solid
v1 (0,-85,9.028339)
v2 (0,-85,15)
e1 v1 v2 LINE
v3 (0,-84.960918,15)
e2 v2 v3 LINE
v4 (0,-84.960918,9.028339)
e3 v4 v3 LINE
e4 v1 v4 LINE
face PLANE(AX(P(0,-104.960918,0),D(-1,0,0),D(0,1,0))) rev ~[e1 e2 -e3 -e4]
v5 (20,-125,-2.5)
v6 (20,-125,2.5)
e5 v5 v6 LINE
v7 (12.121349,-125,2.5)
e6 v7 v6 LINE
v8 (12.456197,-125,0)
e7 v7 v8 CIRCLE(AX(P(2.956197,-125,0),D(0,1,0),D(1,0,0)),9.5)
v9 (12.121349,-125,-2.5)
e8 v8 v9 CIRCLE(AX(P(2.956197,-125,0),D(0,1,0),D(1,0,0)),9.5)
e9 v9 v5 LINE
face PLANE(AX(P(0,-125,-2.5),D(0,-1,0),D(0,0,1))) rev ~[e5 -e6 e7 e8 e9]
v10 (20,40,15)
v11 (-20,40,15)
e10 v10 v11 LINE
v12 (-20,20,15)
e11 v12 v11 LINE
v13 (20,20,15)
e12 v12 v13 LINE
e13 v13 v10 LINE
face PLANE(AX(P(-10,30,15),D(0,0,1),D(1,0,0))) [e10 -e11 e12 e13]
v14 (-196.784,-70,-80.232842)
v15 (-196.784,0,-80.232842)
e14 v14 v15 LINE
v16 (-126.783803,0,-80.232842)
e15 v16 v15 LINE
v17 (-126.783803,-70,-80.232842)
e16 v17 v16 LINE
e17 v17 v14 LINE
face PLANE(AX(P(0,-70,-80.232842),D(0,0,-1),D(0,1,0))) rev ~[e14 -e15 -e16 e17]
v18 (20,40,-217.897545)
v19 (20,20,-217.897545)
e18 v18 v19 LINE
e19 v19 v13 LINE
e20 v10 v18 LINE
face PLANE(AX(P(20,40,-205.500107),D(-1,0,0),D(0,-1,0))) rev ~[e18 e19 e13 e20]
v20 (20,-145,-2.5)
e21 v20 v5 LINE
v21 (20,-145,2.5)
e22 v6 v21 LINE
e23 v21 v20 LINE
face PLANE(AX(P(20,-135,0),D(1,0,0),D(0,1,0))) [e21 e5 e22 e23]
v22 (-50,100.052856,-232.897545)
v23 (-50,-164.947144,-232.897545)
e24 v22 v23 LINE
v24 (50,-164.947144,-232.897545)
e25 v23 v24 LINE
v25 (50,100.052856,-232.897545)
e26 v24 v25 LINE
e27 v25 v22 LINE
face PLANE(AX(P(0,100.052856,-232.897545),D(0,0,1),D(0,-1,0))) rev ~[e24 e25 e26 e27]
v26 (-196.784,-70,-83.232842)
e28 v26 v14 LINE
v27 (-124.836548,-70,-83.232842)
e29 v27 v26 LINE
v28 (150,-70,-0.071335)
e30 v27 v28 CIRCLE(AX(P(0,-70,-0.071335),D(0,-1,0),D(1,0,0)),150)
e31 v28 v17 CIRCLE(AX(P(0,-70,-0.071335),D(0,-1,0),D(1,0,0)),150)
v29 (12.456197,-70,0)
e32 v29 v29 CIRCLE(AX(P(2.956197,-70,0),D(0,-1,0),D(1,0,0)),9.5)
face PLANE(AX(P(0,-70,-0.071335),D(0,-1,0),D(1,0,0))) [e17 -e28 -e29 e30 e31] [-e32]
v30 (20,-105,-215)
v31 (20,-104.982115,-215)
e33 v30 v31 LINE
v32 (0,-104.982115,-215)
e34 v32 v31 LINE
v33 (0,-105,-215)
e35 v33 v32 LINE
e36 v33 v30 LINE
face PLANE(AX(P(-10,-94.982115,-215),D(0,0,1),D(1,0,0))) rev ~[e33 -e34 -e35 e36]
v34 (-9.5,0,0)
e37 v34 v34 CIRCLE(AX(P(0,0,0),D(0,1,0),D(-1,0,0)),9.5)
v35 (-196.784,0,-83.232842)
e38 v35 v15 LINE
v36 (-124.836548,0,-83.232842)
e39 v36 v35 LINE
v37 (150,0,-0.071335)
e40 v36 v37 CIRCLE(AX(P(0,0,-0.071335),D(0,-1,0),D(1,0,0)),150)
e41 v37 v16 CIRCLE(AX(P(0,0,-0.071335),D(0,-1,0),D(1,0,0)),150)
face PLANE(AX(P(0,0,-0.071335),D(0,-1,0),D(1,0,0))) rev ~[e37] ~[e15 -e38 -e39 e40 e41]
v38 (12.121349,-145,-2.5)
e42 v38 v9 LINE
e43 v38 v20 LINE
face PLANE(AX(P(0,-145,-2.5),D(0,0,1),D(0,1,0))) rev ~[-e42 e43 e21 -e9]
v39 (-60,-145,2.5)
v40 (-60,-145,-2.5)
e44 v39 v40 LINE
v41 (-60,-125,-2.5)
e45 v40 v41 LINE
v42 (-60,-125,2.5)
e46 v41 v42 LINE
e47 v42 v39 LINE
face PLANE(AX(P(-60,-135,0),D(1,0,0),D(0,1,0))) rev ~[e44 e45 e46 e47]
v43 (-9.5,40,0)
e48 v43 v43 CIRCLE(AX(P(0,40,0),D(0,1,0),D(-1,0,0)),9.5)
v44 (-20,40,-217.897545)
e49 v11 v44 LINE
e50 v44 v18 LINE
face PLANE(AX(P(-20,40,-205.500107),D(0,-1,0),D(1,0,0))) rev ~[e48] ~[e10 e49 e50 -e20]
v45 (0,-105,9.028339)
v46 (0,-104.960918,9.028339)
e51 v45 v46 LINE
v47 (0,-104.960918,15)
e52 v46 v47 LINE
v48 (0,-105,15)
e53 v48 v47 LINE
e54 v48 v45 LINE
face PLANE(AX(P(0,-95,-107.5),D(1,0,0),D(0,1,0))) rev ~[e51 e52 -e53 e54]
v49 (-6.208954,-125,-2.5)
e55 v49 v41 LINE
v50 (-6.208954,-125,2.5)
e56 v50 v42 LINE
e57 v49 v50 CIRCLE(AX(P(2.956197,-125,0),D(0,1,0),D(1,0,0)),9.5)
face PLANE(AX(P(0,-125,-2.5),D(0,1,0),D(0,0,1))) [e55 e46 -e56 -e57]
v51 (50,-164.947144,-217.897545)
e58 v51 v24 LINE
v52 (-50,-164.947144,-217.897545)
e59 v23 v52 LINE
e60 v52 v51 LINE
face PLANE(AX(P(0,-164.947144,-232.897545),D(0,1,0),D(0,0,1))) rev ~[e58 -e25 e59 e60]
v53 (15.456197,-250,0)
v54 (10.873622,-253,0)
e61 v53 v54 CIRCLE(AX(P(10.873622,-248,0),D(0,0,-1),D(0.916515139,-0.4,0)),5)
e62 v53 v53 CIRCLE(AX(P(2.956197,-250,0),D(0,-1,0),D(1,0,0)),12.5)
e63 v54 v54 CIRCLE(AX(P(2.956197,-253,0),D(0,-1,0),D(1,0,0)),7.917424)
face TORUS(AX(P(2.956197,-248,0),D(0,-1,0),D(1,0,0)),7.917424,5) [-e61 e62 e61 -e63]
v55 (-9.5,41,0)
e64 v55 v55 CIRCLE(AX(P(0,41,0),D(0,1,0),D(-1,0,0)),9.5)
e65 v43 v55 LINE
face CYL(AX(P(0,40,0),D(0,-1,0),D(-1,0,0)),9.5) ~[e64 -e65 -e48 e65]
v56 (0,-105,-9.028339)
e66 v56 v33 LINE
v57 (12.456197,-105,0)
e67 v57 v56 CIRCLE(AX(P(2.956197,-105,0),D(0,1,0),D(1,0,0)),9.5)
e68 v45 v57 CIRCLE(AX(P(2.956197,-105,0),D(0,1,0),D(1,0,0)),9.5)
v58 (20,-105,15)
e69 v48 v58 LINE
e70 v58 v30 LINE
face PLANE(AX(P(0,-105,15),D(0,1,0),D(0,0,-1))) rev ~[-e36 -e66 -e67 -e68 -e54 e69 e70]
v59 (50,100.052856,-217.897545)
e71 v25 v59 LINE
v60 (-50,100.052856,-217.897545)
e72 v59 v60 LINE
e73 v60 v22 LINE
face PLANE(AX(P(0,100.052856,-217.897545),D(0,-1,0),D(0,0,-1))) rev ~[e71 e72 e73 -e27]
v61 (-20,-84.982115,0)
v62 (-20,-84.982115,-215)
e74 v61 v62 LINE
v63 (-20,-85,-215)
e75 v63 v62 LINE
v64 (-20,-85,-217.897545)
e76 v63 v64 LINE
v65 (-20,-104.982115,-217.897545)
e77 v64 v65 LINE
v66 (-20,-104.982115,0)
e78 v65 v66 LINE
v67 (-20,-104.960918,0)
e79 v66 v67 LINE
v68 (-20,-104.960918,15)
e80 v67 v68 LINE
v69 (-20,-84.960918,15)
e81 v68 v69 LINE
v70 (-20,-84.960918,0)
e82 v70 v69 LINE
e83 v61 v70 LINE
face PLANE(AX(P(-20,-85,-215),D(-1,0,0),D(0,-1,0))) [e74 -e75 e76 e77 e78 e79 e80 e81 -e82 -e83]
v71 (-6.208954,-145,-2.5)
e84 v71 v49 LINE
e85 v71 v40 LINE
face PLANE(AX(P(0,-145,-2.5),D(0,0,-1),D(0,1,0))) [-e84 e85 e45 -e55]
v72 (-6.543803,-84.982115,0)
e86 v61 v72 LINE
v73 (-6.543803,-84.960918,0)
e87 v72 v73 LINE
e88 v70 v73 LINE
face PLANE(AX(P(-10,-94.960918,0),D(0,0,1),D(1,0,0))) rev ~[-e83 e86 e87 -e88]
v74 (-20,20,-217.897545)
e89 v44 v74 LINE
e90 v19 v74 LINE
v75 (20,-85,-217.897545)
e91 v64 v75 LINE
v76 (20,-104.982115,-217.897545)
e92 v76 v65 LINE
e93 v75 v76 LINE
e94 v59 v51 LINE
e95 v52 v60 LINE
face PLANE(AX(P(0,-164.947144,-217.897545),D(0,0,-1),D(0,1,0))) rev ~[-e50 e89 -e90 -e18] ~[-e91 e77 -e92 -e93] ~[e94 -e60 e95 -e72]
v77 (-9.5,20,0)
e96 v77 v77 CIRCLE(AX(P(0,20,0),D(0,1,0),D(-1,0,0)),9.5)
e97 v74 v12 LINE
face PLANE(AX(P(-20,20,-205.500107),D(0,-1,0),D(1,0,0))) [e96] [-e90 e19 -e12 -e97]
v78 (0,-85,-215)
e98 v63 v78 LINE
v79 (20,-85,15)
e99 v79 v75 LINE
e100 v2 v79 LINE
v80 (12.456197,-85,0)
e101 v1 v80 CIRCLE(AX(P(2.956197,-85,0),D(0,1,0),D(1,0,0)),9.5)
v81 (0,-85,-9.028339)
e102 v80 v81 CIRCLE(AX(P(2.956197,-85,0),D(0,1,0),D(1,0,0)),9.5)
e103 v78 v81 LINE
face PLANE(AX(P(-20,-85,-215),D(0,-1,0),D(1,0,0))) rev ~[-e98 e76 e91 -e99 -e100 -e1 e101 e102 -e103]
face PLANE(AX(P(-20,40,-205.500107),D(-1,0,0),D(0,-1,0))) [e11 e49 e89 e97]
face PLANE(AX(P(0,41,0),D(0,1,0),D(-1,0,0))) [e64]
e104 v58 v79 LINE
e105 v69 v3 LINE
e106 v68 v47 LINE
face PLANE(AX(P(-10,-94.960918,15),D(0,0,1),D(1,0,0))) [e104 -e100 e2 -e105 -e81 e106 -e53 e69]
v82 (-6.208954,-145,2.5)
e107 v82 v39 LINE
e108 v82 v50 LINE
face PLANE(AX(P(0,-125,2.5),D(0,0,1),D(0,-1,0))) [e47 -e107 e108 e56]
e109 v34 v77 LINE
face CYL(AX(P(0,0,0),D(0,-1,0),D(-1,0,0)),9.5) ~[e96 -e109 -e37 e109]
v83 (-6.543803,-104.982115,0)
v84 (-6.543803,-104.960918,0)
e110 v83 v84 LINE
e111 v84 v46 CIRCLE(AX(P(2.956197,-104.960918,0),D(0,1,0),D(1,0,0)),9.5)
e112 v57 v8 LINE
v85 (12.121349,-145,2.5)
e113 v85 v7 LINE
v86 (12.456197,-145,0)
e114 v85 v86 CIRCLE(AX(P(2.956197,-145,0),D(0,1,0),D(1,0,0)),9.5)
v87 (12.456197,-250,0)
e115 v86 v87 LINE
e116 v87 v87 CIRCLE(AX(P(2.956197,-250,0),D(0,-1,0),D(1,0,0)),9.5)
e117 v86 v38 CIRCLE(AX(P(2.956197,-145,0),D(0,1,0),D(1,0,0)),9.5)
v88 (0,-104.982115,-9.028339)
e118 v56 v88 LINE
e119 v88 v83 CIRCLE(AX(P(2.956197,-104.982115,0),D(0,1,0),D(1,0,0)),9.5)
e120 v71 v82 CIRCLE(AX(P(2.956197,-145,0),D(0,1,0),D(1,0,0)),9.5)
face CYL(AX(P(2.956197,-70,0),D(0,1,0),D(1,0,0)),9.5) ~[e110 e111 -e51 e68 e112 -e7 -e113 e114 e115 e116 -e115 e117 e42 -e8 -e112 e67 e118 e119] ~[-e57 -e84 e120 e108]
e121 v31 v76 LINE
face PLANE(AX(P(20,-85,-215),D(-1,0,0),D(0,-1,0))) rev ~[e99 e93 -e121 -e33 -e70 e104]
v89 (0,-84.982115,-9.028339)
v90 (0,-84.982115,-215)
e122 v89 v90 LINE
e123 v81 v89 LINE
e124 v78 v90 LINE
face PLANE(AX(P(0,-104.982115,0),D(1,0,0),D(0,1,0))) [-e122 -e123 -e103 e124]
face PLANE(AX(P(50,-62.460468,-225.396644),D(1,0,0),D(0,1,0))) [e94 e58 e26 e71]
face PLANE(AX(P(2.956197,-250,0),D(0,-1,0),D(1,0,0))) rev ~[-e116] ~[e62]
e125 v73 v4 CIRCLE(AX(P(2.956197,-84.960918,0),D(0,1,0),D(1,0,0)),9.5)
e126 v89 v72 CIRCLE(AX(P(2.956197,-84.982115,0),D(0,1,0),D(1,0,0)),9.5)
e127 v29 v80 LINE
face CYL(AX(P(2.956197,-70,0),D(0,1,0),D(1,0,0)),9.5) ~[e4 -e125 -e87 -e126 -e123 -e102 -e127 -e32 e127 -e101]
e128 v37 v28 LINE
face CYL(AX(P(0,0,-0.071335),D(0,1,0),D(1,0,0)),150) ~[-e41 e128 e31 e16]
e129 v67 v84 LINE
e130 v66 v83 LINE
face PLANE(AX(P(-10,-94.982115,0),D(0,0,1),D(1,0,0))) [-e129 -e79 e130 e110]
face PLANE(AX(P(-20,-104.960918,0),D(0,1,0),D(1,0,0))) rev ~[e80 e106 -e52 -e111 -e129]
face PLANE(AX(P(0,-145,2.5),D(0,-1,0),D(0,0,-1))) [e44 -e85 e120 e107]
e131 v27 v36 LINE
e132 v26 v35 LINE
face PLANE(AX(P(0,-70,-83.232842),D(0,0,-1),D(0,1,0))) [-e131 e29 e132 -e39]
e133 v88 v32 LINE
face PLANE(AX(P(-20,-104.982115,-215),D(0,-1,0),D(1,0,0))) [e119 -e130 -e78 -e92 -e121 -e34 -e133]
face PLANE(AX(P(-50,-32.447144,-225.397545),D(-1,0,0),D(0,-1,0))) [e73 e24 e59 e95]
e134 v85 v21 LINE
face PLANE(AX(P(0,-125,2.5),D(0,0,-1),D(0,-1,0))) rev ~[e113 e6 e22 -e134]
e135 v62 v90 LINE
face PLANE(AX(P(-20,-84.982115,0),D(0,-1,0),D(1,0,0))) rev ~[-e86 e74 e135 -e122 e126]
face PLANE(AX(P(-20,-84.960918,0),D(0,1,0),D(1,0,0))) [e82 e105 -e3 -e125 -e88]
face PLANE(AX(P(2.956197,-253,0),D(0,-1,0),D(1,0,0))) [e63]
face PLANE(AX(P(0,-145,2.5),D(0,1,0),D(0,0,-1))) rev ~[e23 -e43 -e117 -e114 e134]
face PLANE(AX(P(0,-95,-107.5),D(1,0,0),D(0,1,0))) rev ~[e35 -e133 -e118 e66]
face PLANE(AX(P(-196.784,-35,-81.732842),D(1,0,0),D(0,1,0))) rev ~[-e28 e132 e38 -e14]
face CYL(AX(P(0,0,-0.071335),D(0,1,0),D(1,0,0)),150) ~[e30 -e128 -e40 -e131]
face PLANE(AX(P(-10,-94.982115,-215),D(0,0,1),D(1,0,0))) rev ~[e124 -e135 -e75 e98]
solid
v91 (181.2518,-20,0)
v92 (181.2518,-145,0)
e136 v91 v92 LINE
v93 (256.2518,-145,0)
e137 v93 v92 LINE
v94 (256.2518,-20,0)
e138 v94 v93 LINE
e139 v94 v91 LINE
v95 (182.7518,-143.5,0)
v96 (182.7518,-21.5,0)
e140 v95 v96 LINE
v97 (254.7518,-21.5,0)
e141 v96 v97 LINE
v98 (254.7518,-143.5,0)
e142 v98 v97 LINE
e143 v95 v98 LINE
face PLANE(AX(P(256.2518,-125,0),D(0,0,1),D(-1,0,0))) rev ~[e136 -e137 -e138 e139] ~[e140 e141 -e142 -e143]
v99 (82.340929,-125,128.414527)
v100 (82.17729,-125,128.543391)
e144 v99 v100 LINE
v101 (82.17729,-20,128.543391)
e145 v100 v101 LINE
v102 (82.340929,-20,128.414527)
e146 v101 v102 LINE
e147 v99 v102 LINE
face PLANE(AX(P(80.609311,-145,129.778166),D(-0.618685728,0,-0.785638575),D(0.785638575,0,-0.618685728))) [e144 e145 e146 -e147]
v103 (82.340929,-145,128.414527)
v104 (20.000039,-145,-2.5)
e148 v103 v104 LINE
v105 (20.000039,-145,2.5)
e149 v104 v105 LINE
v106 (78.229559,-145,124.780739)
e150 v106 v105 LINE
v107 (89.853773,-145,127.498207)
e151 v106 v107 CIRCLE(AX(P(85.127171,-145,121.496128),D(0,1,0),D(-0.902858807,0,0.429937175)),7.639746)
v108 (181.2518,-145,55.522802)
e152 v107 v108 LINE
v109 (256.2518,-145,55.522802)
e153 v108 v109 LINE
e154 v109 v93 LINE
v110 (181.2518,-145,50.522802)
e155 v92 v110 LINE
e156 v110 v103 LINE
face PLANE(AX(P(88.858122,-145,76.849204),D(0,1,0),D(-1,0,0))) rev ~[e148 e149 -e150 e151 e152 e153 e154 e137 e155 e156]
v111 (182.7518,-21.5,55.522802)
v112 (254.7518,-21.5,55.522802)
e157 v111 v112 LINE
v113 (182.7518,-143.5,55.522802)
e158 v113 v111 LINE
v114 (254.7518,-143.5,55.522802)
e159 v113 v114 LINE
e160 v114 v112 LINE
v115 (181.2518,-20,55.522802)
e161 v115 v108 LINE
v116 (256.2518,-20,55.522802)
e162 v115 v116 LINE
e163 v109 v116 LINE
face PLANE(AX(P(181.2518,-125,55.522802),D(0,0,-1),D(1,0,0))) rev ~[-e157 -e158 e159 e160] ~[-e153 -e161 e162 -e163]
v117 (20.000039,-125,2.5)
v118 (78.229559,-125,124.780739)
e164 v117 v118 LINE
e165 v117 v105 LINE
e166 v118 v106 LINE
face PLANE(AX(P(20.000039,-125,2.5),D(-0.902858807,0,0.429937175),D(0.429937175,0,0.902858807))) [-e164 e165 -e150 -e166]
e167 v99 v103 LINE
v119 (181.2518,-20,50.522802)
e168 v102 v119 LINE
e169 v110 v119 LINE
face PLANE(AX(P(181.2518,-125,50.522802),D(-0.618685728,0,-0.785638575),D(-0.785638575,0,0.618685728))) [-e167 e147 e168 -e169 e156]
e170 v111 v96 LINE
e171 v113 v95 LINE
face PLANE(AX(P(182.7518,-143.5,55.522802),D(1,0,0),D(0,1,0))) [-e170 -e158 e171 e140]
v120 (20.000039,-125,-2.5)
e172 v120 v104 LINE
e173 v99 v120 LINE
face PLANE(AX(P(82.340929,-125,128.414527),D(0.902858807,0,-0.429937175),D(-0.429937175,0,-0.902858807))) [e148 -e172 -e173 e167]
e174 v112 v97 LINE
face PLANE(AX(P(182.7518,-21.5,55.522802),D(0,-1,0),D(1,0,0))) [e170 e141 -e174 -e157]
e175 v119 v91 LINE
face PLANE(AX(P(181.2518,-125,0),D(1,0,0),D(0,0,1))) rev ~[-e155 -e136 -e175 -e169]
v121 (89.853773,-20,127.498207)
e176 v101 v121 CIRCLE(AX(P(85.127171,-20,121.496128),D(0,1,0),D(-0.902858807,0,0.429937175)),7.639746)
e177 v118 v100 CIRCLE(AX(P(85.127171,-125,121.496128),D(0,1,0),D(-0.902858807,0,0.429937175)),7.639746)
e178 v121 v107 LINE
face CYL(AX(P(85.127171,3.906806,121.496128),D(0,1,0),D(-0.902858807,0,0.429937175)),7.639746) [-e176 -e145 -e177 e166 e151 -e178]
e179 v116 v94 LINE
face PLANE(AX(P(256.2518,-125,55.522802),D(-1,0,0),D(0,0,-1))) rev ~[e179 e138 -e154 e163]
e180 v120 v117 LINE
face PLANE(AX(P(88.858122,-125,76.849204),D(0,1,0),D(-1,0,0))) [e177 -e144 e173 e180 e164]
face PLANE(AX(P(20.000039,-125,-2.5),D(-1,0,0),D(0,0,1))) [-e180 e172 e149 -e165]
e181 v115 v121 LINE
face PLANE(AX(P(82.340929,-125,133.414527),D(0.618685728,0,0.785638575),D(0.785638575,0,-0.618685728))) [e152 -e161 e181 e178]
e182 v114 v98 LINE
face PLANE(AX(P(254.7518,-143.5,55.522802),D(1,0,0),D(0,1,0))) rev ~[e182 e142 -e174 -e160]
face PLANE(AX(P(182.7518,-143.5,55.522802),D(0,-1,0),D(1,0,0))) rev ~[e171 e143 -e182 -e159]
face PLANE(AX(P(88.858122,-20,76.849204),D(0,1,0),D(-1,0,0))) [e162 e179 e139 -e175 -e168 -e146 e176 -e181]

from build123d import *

# Parameters (mm, degrees)
F0_R         = 150
F1_DEPTH     = 70
F2_W         = 70
F2_H         = 3
F3_DEPTH     = 196.784
F5_R         = 9.5
F6_DEPTH     = 180
F7_R         = 9.5
F8_DEPTH     = 40
F9_W         = 20
F9_H         = 215
F10_DEPTH    = 20
F11_W        = 20
F11_H        = 18.9998925924
F11_H_2      = 196.0001074076
F12_DEPTH    = 20
F13_W        = 20
F13_H        = 20
F14_DEPTH    = 15
F15_W        = 40
F15_H        = 20
F16_DEPTH    = 25
F17_W        = 20
F17_H        = 215
F17_H_2      = 15
F18_DEPTH    = 20
F19_W        = 20
F19_H        = 20
F20_DEPTH    = 15
F21_W        = 20
F21_H        = 20
F22_DEPTH    = 215
F23_W        = 40
F23_H        = 19.9821153283
F24_DEPTH    = 15.5
F26_DEPTH    = 50
F28_DEPTH    = 50
F30_DEPTH    = 60
F31_DEPTH    = 20
F34_DEPTH    = 20
F36_DEPTH    = 125
F37_DEPTH    = 105
F38_W        = 72
F38_H        = 122
F30_FACE_W   = 53.7910459743
F30_FACE_H   = 20
F39_DEPTH    = 161
F40_R        = 12.5
F41_DEPTH    = 3
F43_R        = 9.5
F44_DEPTH    = 1
F45_T1_DEPTH = 172.813612667


# Not quite as in the source:
# - a fillet or chamfer that OpenCascade refuses, or shapes differently, is made with other operations: its cross-section is extruded or revolved along the edge and cut away or added


with BuildPart() as f1:
    # F0 (on Front) → F1 (new body)
    with BuildSketch(Plane.XZ):
        with Locations((0, -0.0713349276)):
            Circle(F0_R)
    extrude(amount=F1_DEPTH)

    # F2 (on Right) → F3 (join)
    with BuildSketch(Plane.YZ):
        with Locations((-35, -81.7328423858)):
            Rectangle(F2_W, F2_H)
    extrude(amount=-F3_DEPTH)

    # F5 (on face) → F6 (join)
    with BuildSketch(Plane.XZ.offset(70)):
        with Locations((2.9561973643, 0)):
            Circle(F5_R)
    extrude(amount=F6_DEPTH)

    # F7 (on face) → F8 (join)
    with BuildSketch(Plane(origin=(0, 0, 0), x_dir=(-1, 0, 0), z_dir=(0, 1, 0))):
        Circle(F7_R)
    extrude(amount=F8_DEPTH)

    # F9 (on Right) → F10 (join)
    with BuildSketch(Plane.YZ):
        with Locations((30, -98.0001074076)):
            Rectangle(F9_W, F9_H)
    extrude(amount=-F10_DEPTH)

    # F11 (on face) → F12 (join)
    with BuildSketch(Plane.YZ):
        with Locations((30, -5.37038e-05)):
            Rectangle(F11_W, F11_H)
        with Locations((30, -107.5000537038)):
            Rectangle(F11_W, F11_H_2)
    extrude(amount=F12_DEPTH)

    # F13 (on Top) → F14 (join)
    with BuildSketch(Plane.XY):
        with Locations((-10, 30)):
            Rectangle(F13_W, F13_H)
        with Locations((10, 30)):
            Rectangle(F13_W, F13_H)
    extrude(amount=F14_DEPTH)

    # F15 (on face) → F16 (join)
    with BuildSketch(Plane(origin=(0, 0, -205.5001074076), x_dir=(1, 0, 0), z_dir=(0, 0, -1))):
        with Locations((0, -30)):
            Rectangle(F15_W, F15_H)
    extrude(amount=F16_DEPTH)

    # F17 (on Right) → F18 (join)
    with BuildSketch(Plane.YZ):
        with Locations((-95, -107.5)):
            Rectangle(F17_W, F17_H)
        with Locations((-95, 7.5)):
            Rectangle(F17_W, F17_H_2)
    extrude(amount=F18_DEPTH)

    # F19 (on Top) → F20 (join)
    with BuildSketch(Plane.XY):
        with Locations((-10, -94.9609184265)):
            Rectangle(F19_W, F19_H)
    extrude(amount=F20_DEPTH)

    # F21 (on Top) → F22 (join)
    with BuildSketch(Plane.XY):
        with Locations((-10, -94.9821153283)):
            Rectangle(F21_W, F21_H)
    extrude(amount=-F22_DEPTH)

    # F23 (on face) → F24 (join)
    with BuildSketch(Plane(origin=(0, 0, -215), x_dir=(1, 0, 0), z_dir=(0, 0, -1))):
        with Locations((0, 94.9910576642)):
            Rectangle(F23_W, F23_H)
    extrude(amount=F24_DEPTH)

    # F25 (on Right) → F26 (join)
    with BuildSketch(Plane.YZ):
        Polygon((40.000025183, -230.4975450993), (40.0528562069, -217.8975450993), (40.0000102818, -217.8975450993), (-141.9770932198, -217.8975450993), (-164.9471437931, -217.8975450993), (-164.9471437931, -232.8975450993), (-126.0763406754, -232.8975450993), (20.0036764145, -232.8975450993), (40.000025183, -232.8975450993), align=None)
        Polygon((100.0528562069, -217.8975450993), (40.0528562069, -217.8975450993), (40.000025183, -230.4975450993), (40.000025183, -232.8975450993), (100.0528562069, -232.8975450993), align=None)
    extrude(amount=F26_DEPTH)

    # F27 (on face) → F28 (join)
    with BuildSketch(Plane(origin=(0, 0, 0), x_dir=(0, -1, 0), z_dir=(-1, 0, 0))):
        Polygon((164.9471437931, -217.8975450993), (-100.0528562069, -217.8975450993), (-100.0528562069, -232.8975450993), (-40, -232.8975450993), (164.9471437931, -232.8975450993), align=None)
    extrude(amount=F28_DEPTH)

    # F29 (on Right) → F30 (join)
    with BuildSketch(Plane.YZ):
        Polygon((-145, 2.5), (-145, -2.5), (-125, -2.5), (-125, 0), (-125, 2.5), align=None)
    extrude(amount=-F30_DEPTH)

    # F29 (on Right) → F31 (join)
    with BuildSketch(Plane.YZ):
        Polygon((-145, 2.5), (-145, -2.5), (-125, -2.5), (-125, 0), (-125, 2.5), align=None)
    extrude(amount=F31_DEPTH)

    # F40 (on face) → F41 (join)
    with BuildSketch(Plane.XZ.offset(250)):
        with Locations((2.9561973643, 0)):
            Circle(F40_R)
    extrude(amount=F41_DEPTH)

    # F42: fillet of radius 5 on 1 edges, made by hand

    # F42_s1 → F42_t2 (revolve, cut)
    with BuildSketch(Plane.XY):
        with BuildLine():
            ThreePointArc((15.4561973643, -250), (13.6122344568, -252.1833001327), (10.8736216693, -253))
            Line((10.8736216693, -253), (15.4561973643, -253))
            Line((15.4561973643, -253), (15.4561973643, -250))
        make_face()
    revolve(axis=Axis((2.9561973643, -253, 0), (0, -1, 0)), mode=Mode.SUBTRACT)

    # F43 (on face) → F44 (join)
    with BuildSketch(Plane(origin=(0, 40, 0), x_dir=(-1, 0, 0), z_dir=(0, 1, 0))):
        Circle(F43_R)
    extrude(amount=F44_DEPTH)


with BuildPart() as f34:
    # F33 (on offset) → F34 (new body)
    with BuildSketch(Plane(origin=(0, -125, 0), x_dir=(-1, 0, 0), z_dir=(0, 1, 0))):
        Polygon((-20.0000386685, -2.5), (-20.0000386685, 0), (-20.0000386685, 2.5), (-82.3409290722, 133.4145270154), (-181.2517998233, 55.5228017236), (-181.2517998233, 50.5228017236), (-82.3409290722, 128.4145270154), align=None)
        Polygon((-181.2517998233, 50.5228017236), (-181.2517998233, 55.5228017236), (-256.2517998233, 55.5228017236), (-256.2517998233, 0), (-181.2517998233, 0), align=None)
    extrude(amount=-F34_DEPTH)

    # F35 (on face) → F36 (join)
    with BuildSketch(Plane.XZ.offset(145)):
        Polygon((80.6093108737, 129.7781660978), (82.3409290722, 128.4145270154), (181.2517998233, 50.5228017236), (181.2517998233, 55.5228017236), (82.3409290722, 133.4145270154), align=None)
    extrude(amount=-F36_DEPTH)

    # F37 (add): a face of the model
    f37_faces = [f34.faces().sort_by_distance(p)[0] for p in [
        (218.7517998233, -125, 27.7614008618),
    ]]
    extrude(f37_faces, amount=F37_DEPTH)

    # F38 (on face) + F30_face (on face) → F39 (cut)
    with BuildSketch(Plane.XY.offset(55.5228017236)):
        with Locations((218.7517998233, -82.5)):
            Rectangle(F38_W, F38_H)
    with BuildSketch(Plane(origin=(-33.1044770128, -135, 2.5), x_dir=(1, 0, 0), z_dir=(0, 0, 1))):
        Rectangle(F30_FACE_W, F30_FACE_H)
    extrude(amount=-F39_DEPTH, mode=Mode.SUBTRACT)

    # F45: fillet of radius 7.6397458968 on 1 edges, made by hand

    # F45_s2 → F45_t1 (cut)
    with BuildSketch(Plane.XZ.offset(-3.9068063335)):
        with BuildLine():
            ThreePointArc((78.229559159, 124.7807387572), (83.3880678847, 128.9352971366), (89.8537727751, 127.4982070657))
            Line((89.8537727751, 127.4982070657), (82.3409290722, 133.4145270154))
            Line((82.3409290722, 133.4145270154), (78.229559159, 124.7807387572))
        make_face()
    extrude(amount=F45_T1_DEPTH, mode=Mode.SUBTRACT)


solid = Compound([f1.part, f34.part])
